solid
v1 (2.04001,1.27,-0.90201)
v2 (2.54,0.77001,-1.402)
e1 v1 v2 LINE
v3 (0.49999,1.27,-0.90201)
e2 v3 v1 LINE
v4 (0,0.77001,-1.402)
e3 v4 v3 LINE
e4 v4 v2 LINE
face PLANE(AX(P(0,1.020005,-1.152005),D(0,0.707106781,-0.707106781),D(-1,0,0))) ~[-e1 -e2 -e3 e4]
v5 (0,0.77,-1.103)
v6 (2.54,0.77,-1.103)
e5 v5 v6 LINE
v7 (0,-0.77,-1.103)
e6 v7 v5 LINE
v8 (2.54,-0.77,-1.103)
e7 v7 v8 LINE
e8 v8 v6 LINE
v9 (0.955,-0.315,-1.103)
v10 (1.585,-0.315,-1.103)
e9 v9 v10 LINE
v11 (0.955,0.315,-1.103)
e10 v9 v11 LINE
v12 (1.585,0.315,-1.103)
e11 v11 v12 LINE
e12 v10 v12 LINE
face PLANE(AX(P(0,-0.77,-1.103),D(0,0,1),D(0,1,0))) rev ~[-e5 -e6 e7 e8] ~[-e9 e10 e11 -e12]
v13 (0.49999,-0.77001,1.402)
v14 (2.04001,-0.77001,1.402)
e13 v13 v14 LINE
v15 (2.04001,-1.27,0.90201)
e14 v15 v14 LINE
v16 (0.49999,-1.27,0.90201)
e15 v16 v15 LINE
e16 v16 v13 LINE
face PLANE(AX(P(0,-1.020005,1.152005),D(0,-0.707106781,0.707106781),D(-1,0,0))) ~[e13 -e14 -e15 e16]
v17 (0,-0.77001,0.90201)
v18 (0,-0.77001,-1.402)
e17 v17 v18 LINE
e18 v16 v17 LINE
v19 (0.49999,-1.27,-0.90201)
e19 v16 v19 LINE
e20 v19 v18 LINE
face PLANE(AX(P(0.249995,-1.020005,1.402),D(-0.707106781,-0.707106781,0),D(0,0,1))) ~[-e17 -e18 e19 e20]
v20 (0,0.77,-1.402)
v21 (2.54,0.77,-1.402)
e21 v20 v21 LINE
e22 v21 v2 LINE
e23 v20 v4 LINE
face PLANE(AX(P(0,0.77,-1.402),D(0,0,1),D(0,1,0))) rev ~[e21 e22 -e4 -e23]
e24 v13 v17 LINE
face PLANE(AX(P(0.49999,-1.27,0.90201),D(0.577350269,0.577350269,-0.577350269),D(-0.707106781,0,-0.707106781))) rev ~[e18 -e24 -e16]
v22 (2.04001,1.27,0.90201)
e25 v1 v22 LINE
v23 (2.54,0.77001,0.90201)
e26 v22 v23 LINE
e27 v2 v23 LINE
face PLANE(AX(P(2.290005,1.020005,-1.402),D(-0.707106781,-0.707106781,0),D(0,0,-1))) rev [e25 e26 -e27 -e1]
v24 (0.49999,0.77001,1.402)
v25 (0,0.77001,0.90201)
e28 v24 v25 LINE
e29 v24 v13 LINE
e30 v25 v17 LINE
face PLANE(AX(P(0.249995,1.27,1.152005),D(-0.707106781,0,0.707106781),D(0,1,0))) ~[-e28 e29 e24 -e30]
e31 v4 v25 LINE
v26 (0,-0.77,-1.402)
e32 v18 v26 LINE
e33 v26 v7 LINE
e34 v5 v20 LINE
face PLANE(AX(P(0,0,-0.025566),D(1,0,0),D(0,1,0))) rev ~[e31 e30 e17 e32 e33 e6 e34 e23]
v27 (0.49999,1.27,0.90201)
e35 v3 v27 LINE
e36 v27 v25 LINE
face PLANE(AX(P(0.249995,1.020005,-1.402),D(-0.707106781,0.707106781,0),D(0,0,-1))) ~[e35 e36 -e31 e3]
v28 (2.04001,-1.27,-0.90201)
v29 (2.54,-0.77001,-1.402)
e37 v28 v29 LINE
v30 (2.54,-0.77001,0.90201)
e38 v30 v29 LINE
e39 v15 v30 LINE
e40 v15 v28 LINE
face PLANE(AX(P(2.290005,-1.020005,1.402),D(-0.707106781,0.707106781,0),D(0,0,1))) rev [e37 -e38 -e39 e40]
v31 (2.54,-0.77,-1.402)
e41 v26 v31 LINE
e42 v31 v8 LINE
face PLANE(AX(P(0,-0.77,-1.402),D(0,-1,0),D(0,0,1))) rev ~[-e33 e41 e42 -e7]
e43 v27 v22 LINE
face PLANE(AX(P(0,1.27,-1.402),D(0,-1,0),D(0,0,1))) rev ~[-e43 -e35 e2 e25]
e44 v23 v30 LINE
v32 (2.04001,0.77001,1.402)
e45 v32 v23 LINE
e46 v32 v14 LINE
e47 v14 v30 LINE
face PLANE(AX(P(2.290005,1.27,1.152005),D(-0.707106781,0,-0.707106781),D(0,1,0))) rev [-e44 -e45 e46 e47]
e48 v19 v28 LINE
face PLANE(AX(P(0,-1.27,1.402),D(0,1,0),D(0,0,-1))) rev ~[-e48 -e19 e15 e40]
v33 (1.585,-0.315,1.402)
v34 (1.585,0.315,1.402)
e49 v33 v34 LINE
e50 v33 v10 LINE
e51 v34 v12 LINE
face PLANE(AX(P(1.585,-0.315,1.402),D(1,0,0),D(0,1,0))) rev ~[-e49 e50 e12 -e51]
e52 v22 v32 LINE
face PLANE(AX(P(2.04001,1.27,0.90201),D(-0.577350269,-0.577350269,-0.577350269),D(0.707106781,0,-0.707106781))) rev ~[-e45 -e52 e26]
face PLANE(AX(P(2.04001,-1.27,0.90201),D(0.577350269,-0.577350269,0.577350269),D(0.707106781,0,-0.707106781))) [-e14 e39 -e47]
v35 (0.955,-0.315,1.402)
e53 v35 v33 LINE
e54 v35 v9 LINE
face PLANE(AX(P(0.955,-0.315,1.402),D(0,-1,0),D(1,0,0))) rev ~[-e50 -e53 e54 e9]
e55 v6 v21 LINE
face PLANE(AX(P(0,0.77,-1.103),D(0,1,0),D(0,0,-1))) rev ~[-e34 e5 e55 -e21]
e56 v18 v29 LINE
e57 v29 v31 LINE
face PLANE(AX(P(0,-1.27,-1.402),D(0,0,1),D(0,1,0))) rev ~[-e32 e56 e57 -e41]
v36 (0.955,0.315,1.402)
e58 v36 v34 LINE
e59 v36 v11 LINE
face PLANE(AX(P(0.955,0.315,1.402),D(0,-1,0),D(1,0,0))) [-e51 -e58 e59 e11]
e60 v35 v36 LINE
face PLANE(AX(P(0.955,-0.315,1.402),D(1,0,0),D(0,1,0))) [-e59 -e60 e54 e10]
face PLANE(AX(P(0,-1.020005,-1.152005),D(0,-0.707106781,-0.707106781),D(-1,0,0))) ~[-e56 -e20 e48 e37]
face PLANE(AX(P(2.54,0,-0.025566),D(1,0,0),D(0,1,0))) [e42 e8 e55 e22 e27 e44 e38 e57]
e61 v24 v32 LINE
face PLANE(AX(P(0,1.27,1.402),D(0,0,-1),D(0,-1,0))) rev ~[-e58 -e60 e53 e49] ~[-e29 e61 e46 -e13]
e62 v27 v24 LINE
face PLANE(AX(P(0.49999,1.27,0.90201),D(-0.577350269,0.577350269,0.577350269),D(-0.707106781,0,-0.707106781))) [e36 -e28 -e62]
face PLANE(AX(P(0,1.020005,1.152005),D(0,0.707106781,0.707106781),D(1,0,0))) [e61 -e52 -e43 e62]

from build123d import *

# Parameters (mm, degrees)
F1_DEPTH = 2.54
F2_SIZE  = 0.49999
F3_W     = 0.63
F3_H     = 0.63
F4_DEPTH = 2.505


# Not quite as in the source:
# - a fillet or chamfer is up to 0.001 mm smaller than in the source, because OpenCascade refuses the exact size


with BuildPart() as f1:
    # F0 (on Right) → F1 (new body)
    with BuildSketch(Plane.YZ):
        Polygon((1.27, 1.402), (-1.27, 1.402), (-1.27, -1.402), (-0.77, -1.402), (-0.77, -1.103), (0.77, -1.103), (0.77, -1.402), (1.27, -1.402), align=None)
    extrude(amount=F1_DEPTH)

    # F2 (size 0.5 in the source; OpenCascade refuses exactly that, so slightly less here)
    f2_edges = [f1.edges().sort_by_distance(p)[0] for p in [
        (2.54, 0, 1.402),
        (0, 0, 1.402),
        (1.27, -1.27, 1.402),
        (1.27, 1.27, 1.402),
        (2.54, 1.27, 0),
        (1.27, 1.27, -1.402),
        (0, 1.27, 0),
        (2.54, -1.27, 0),
        (0, -1.27, 0),
        (1.27, -1.27, -1.402),
    ]]
    chamfer(f2_edges, length=F2_SIZE)

    # F3 (on face) → F4 (cut, through all)
    with BuildSketch(Plane.XY.offset(1.402)):
        with Locations((1.27, 0)):
            Rectangle(F3_W, F3_H)
    extrude(amount=-F4_DEPTH, mode=Mode.SUBTRACT)


solid = f1.part
